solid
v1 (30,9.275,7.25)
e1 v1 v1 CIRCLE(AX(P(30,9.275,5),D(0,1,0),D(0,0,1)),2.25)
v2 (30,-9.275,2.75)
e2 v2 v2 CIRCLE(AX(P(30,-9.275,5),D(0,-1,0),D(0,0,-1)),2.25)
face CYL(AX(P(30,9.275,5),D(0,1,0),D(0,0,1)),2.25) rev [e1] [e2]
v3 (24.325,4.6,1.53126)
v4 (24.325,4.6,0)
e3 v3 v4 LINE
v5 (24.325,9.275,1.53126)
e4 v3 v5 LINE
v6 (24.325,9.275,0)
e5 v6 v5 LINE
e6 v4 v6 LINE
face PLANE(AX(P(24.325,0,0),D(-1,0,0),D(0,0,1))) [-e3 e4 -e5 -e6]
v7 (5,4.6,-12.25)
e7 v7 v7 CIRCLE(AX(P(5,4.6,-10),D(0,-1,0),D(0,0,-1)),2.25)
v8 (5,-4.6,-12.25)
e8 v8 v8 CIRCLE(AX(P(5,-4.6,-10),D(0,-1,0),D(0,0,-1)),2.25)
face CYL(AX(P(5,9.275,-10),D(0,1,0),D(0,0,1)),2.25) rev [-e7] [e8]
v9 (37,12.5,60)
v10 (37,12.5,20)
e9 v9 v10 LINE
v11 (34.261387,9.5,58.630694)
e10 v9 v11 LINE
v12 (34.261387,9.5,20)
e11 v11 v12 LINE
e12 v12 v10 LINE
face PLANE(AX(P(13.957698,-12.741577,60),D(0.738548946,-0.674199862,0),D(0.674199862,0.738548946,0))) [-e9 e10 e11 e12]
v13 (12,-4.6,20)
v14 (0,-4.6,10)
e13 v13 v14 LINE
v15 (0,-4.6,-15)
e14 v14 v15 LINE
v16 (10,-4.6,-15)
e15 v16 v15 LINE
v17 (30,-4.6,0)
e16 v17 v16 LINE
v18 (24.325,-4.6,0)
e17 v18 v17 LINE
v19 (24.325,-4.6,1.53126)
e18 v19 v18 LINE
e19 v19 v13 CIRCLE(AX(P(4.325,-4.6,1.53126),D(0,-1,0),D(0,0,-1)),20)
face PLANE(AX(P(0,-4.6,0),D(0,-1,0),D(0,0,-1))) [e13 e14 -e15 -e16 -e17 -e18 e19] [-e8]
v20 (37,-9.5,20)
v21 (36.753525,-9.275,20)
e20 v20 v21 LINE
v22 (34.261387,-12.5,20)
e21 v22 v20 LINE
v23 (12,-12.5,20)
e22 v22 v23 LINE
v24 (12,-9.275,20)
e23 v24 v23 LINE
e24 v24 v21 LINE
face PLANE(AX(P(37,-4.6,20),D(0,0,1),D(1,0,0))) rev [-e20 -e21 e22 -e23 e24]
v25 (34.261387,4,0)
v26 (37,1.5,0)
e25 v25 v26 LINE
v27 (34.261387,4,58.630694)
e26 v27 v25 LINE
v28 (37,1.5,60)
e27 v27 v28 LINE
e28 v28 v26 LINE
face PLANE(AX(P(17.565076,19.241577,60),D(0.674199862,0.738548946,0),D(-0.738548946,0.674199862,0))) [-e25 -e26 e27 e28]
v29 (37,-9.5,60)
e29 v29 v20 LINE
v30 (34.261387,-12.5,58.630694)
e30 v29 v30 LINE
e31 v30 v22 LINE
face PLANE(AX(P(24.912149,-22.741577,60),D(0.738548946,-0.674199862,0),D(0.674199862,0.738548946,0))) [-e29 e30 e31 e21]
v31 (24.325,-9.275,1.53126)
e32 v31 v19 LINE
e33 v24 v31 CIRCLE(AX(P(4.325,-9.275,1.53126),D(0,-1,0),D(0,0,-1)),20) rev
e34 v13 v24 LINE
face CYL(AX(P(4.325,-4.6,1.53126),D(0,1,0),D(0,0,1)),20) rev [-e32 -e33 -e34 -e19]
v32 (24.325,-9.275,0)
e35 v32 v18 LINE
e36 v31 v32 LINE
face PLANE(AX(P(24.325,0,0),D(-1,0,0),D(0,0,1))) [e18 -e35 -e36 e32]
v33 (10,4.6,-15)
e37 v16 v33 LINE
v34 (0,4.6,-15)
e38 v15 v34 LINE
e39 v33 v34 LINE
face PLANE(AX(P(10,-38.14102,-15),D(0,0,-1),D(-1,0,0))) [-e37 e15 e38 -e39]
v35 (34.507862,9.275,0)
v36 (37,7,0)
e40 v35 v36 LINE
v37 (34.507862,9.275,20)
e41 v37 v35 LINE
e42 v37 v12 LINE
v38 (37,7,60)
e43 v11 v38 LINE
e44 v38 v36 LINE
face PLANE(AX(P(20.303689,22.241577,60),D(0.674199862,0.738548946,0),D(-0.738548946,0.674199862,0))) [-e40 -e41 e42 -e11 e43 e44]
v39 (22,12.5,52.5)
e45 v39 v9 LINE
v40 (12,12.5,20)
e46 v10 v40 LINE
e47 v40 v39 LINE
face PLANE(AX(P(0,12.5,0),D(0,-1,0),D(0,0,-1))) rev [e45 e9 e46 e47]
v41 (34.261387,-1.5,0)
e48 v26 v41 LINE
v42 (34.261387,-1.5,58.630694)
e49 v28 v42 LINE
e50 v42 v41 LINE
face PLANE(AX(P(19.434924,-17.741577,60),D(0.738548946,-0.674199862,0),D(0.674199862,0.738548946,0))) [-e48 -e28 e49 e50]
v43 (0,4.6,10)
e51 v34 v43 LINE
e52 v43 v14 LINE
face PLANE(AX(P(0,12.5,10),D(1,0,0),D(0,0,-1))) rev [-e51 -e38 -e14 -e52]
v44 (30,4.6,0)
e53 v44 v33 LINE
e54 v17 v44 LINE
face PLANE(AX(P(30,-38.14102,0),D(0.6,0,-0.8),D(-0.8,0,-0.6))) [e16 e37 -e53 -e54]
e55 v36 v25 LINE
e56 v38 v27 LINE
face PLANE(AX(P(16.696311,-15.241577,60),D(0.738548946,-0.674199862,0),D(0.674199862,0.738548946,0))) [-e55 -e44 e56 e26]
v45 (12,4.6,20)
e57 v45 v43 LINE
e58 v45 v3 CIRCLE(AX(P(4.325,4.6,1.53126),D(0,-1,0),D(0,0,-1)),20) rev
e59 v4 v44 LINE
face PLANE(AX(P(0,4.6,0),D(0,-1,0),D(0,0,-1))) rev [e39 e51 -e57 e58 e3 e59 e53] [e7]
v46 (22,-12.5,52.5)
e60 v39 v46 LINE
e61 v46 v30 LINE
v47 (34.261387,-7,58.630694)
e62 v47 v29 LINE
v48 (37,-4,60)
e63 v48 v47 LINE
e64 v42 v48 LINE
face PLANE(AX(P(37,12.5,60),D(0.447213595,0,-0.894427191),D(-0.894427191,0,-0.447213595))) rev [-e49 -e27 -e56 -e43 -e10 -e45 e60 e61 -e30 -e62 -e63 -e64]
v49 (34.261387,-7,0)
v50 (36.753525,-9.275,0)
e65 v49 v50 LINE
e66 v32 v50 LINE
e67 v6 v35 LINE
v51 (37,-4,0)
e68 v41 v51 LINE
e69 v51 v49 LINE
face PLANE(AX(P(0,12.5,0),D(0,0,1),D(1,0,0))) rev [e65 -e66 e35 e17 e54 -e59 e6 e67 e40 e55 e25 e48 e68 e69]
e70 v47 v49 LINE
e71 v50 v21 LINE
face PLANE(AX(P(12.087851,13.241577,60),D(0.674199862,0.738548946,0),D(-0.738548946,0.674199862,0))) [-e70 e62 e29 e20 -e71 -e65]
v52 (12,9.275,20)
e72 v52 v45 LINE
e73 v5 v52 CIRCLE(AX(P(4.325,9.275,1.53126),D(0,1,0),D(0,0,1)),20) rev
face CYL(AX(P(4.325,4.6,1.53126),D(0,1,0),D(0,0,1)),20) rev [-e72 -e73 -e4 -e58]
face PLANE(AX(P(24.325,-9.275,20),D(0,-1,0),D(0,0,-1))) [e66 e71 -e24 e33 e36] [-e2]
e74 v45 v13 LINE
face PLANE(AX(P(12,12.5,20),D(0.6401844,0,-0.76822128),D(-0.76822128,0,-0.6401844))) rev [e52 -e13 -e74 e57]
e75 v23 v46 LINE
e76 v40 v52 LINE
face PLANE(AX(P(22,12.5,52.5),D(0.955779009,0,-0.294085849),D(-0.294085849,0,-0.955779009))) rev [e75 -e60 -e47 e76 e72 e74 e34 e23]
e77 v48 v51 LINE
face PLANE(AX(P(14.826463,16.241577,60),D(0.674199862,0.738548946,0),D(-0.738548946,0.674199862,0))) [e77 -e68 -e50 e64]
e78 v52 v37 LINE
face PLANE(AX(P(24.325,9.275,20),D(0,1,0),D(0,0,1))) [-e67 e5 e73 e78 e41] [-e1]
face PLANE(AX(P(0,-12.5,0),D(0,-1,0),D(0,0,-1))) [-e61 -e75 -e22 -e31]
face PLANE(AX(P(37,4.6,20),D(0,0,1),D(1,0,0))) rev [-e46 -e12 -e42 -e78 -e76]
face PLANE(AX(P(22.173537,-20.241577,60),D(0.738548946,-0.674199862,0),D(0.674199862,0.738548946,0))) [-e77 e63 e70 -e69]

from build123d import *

# Parameters (mm, degrees)
BOSS_EXTRUDE1_DEPTH  = 12.5
SKETCH3_W            = 37
SKETCH3_H            = 20
CUT_EXTRUDE1_DEPTH   = 7.9
SKETCH4_W            = 37
SKETCH4_H            = 20
CUT_EXTRUDE2_DEPTH   = 7.9
SKETCH5_W            = 20
SKETCH5_H            = 18.55
BOSS_EXTRUDE2_DEPTH  = 12.675
BOSS_EXTRUDE3_DEPTH  = 9.2
M4_CLEARANCE_HOLE1_D = 4.5
CUT_EXTRUDE3_DEPTH   = 72.590851371
FILLET1_R            = 20


with BuildPart() as part:
    # Sketch2 → Boss-Extrude1 (new, symmetric)
    with BuildSketch(Plane(origin=(0, 0, 0), x_dir=(1, 0, 0), z_dir=(0, 1, 0))):
        Polygon((0, 0), (37, 0), (37, -60), (22, -52.5), (12, -20), (0, -10), align=None)
    extrude(amount=BOSS_EXTRUDE1_DEPTH, both=True)

    # Sketch3 → Cut-Extrude1 (cut)
    with BuildSketch(Plane(origin=(0, 12.5, 0), x_dir=(1, 0, 0), z_dir=(0, 1, 0))):
        with Locations((18.5, -10)):
            Rectangle(SKETCH3_W, SKETCH3_H)
    extrude(amount=-CUT_EXTRUDE1_DEPTH, mode=Mode.SUBTRACT)

    # Sketch4 → Cut-Extrude2 (cut)
    with BuildSketch(Plane(origin=(0, -12.5, 0), x_dir=(-1, 0, 0), z_dir=(0, -1, 0))):
        with Locations((-18.5, -10)):
            Rectangle(SKETCH4_W, SKETCH4_H)
    extrude(amount=-CUT_EXTRUDE2_DEPTH, mode=Mode.SUBTRACT)

    # Sketch5 → Boss-Extrude2 (add)
    with BuildSketch(Plane(origin=(37, 0, 0), x_dir=(0, 0, -1), z_dir=(1, 0, 0))):
        with Locations((-10, 0)):
            Rectangle(SKETCH5_W, SKETCH5_H)
    extrude(amount=-BOSS_EXTRUDE2_DEPTH)

    # Sketch10 → Boss-Extrude3 (add)
    with BuildSketch(Plane(origin=(0, 4.6, 0), x_dir=(1, 0, 0), z_dir=(0, 1, 0))):
        Polygon((30, 0), (10, 15), (0, 15), (0, 0), align=None)
    extrude(amount=-BOSS_EXTRUDE3_DEPTH)

    # M4 Clearance Hole1 (through all)
    with Locations(Plane(origin=(0, 9.275, 0), x_dir=(1, 0, 0), z_dir=(0, 1, 0))):
        with Locations((30, -5), (5, 10)):
            Hole(M4_CLEARANCE_HOLE1_D / 2)

    # Sketch8 → Cut-Extrude3 (cut, through all)
    with BuildSketch(Plane(origin=(0, 0, 0), x_dir=(-1, 0, 0), z_dir=(0, 0, -1))):
        Polygon((-34.261387212, 4), (-37, 7), (-37, 1.5), align=None)
        Polygon((-34.261387212, -1.5), (-37, 1.5), (-37, -4), align=None)
        Polygon((-34.261387212, 9.5), (-37, 12.5), (-37, 9.275), (-34.507862363, 9.275), align=None)
        Polygon((-34.507862363, 9.275), (-37, 9.275), (-37, 7), align=None)
        Polygon((-34.261387212, -7), (-37, -4), (-37, -9.275), (-36.753524849, -9.275), align=None)
        Polygon((-36.753524849, -9.275), (-37, -9.275), (-37, -9.5), align=None)
        Polygon((-34.261387212, -12.5), (-37, -9.5), (-37, -12.5), align=None)
    extrude(amount=-CUT_EXTRUDE3_DEPTH, mode=Mode.SUBTRACT)

    # Fillet1
    # the kernel refuses this fillet: 20 mm, written as the material it adds along each edge
    with BuildSketch(Plane(origin=(24.325, 41.571851206, 20), x_dir=(0, 0, -1), z_dir=(0, -1, 0))) as fillet1_piece_1_section:
        with BuildLine():
            CenterArc((18.468740482, -20), FILLET1_R, 90, 67.433839366)
            Line((0, -12.325), (-0.36937481, -12.1715))
            ThreePointArc((-0.36937481, -12.1715), (-0.4, -6.1625), (-0.4, 0))
            Line((-0.4, 0), (0, 0.4))
            Line((0, 0.4), (18.468740482, 0.4))
            Line((18.468740482, 0.4), (18.468740482, 0))
        make_face()
    fillet1_piece_1 = extrude(amount=50.846851206, mode=Mode.PRIVATE)
    fillet1_piece_1 = split(fillet1_piece_1, bisect_by=Plane(origin=(21.141865588, 9.275, 15.519731965), z_dir=(0, -1, 0)), keep=Keep.TOP, mode=Mode.PRIVATE)
    add(fillet1_piece_1)
    with BuildSketch(Plane(origin=(24.325, 9.275, 20), x_dir=(0, 0, -1), z_dir=(0, -1, 0))) as fillet1_piece_2_section:
        with BuildLine():
            CenterArc((18.468740482, -20), FILLET1_R, 90, 67.433839366)
            Line((0, -12.325), (-0.36937481, -12.1715))
            ThreePointArc((-0.36937481, -12.1715), (-0.4, -6.1625), (-0.4, 0))
            Line((-0.4, 0), (0, 0.4))
            Line((0, 0.4), (18.468740482, 0.4))
            Line((18.468740482, 0.4), (18.468740482, 0))
        make_face()
    fillet1_piece_2 = extrude(amount=50.846851206, mode=Mode.PRIVATE)
    fillet1_piece_2 = split(fillet1_piece_2, bisect_by=Plane(origin=(21.141865588, -9.275, 15.519731965), z_dir=(0, 1, 0)), keep=Keep.TOP, mode=Mode.PRIVATE)
    add(fillet1_piece_2)


solid = part.part
